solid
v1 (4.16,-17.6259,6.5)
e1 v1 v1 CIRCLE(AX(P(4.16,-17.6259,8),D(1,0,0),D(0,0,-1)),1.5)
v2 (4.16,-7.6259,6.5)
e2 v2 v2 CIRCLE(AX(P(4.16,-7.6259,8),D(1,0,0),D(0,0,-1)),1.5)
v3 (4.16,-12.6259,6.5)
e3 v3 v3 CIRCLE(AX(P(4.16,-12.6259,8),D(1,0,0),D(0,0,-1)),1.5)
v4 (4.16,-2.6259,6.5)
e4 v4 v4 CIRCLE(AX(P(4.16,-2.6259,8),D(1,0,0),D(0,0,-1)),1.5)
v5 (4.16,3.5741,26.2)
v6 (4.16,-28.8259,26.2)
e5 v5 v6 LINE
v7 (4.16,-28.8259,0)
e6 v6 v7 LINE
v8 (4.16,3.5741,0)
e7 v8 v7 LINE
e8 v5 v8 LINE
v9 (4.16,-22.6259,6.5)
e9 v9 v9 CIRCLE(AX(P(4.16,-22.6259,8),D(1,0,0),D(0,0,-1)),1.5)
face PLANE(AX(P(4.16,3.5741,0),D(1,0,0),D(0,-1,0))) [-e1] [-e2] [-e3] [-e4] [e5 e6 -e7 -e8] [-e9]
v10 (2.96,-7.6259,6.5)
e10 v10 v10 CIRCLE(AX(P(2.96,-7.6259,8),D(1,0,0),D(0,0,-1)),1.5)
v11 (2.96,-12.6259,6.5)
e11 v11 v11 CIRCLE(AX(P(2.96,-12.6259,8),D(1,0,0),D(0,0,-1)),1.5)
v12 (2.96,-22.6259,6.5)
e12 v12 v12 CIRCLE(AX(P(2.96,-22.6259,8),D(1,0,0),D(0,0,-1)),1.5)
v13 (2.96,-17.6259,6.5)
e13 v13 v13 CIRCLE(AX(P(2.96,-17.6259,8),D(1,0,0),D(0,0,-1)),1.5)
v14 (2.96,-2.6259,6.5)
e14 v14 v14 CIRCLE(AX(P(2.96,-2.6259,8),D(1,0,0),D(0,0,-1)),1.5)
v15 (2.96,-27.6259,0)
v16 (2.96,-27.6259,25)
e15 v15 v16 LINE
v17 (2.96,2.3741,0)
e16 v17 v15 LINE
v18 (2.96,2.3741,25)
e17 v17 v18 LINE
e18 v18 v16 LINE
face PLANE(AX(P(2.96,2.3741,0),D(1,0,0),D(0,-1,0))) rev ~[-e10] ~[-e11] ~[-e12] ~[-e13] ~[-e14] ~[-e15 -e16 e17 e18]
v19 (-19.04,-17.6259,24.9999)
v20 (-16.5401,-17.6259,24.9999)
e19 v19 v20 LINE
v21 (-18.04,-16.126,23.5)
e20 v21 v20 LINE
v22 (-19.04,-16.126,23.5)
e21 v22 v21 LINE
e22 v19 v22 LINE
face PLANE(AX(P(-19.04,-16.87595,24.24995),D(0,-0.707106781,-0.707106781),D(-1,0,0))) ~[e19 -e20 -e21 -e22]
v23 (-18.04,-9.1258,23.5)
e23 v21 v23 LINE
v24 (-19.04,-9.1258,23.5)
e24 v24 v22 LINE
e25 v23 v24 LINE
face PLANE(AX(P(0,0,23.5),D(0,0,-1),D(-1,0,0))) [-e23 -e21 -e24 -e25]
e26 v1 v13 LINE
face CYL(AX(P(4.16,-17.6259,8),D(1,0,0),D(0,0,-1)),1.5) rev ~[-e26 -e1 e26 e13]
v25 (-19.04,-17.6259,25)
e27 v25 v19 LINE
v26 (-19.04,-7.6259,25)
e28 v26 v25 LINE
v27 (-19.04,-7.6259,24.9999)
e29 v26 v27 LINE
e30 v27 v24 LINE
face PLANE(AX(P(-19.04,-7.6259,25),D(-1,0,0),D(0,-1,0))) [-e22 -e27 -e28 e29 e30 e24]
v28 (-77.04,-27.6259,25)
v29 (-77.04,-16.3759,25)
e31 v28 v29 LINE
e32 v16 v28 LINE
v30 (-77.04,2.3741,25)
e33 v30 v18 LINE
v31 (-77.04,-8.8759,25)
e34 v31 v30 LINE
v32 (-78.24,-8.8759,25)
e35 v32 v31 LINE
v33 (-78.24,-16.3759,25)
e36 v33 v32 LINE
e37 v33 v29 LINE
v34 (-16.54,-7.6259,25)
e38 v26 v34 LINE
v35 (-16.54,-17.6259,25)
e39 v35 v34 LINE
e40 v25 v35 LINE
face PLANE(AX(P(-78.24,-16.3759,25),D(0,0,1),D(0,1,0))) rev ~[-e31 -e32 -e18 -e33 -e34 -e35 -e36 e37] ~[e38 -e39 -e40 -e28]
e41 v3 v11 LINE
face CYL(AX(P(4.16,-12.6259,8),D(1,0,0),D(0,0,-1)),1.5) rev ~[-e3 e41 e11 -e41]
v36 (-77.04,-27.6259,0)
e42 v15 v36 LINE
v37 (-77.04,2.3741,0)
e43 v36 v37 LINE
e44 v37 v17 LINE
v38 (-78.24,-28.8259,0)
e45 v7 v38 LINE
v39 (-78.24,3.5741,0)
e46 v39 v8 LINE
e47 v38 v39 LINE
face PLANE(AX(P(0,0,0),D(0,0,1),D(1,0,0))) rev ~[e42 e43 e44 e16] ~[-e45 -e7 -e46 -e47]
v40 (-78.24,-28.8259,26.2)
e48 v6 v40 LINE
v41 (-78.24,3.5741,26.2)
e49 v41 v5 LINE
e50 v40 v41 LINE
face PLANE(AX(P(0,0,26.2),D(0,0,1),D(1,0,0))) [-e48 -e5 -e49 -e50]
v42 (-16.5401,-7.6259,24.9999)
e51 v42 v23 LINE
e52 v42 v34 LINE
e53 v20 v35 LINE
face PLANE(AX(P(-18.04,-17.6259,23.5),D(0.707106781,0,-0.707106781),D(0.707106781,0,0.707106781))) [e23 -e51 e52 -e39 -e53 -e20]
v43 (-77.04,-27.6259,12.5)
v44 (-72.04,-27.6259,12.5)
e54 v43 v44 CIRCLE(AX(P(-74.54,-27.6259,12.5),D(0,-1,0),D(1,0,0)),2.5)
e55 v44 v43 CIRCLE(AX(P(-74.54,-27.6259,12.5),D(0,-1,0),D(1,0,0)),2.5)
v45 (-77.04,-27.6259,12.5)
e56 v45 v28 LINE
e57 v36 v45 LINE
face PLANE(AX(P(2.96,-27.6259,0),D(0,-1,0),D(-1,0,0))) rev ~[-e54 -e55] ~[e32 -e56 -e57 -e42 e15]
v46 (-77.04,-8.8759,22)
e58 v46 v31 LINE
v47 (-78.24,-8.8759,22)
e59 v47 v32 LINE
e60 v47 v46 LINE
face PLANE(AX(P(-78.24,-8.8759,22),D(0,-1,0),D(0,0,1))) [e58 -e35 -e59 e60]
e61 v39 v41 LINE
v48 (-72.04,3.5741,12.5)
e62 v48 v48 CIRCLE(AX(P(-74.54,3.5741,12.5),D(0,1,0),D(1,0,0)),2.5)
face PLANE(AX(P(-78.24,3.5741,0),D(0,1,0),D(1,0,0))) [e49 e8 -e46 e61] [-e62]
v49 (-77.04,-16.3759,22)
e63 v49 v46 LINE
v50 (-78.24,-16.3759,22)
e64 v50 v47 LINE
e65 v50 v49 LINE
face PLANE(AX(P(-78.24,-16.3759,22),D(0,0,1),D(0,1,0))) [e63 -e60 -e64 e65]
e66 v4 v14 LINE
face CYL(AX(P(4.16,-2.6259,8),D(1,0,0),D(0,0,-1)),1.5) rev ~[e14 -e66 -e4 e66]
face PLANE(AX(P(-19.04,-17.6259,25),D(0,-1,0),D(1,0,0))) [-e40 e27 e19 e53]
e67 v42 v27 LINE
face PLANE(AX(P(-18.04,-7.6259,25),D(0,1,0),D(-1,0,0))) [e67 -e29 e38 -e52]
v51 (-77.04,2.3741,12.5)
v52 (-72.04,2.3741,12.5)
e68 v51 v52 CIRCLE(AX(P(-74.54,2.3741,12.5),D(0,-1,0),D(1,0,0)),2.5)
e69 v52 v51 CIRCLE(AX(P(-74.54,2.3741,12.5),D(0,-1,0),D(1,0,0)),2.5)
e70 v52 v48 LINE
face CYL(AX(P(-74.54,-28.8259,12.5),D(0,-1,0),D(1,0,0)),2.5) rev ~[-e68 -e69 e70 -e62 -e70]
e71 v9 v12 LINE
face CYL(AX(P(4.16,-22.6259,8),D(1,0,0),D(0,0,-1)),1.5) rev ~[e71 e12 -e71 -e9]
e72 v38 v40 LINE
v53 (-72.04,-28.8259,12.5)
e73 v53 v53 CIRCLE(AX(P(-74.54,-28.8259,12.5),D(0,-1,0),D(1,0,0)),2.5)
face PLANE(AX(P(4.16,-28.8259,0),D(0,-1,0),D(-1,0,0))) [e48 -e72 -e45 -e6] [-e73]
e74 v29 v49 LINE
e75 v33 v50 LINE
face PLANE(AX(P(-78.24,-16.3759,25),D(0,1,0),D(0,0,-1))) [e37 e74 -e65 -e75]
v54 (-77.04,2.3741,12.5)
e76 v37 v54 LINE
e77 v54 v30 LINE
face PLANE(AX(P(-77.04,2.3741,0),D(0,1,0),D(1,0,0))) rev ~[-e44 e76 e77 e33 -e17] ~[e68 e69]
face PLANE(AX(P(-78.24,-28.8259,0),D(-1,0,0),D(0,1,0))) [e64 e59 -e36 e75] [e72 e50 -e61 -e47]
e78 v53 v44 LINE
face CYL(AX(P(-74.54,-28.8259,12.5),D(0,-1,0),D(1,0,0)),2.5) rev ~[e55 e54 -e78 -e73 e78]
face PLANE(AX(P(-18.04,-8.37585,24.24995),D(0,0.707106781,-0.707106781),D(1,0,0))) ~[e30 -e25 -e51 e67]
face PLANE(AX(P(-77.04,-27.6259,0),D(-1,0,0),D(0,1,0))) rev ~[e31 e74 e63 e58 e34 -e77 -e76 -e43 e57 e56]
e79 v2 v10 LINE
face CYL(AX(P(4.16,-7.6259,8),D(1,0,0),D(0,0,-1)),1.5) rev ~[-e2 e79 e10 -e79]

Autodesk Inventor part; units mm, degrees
ref_plane "YZ Plane" through (0, 0, 0) normal (1, 0, 0) x (0, 1, 0)
ref_plane "XZ Plane" through (0, 0, 0) normal (0, 1, 0) x (-1, 0, 0)
ref_plane "XY Plane" through (0, 0, 0) normal (0, 0, 1) x (1, 0, 0)
sketch "Sketch1" plane through (0, 0, 0) normal (0, 0, 1) x (1, 0, 0)
  line L0 (-78.24, 3.5741) -> (4.16, 3.5741)
  line L1 (4.16, 3.5741) -> (4.16, -28.8259)
  line L2 (4.16, -28.8259) -> (-78.24, -28.8259)
  line L3 (-78.24, -28.8259) -> (-78.24, 3.5741)
  line L4 (-77.04, 2.3741) -> (2.96, 2.3741)
  line L5 (2.96, 2.3741) -> (2.96, -27.6259)
  line L6 (2.96, -27.6259) -> (-77.04, -27.6259)
  line L7 (-77.04, -27.6259) -> (-77.04, 2.3741)
  point P0 (0, 0)
  dimension "d0" = 32.4
  dimension "d1" = 82.4
  dimension "d2" = 1.2
  dimension "d3" = 1.2
  dimension "d4" = 1.2
  dimension "d5" = 1.2
extrude "Extrusion1" add sketch "Sketch1" along normal blind 25
sketch "Sketch2" plane through (0, 0, 25) normal (0, 0, 1) x (1, 0, 0)
  line L0 (-78.24, 3.5741) -> (4.16, 3.5741)
  line L1 (4.16, 3.5741) -> (4.16, -28.8259)
  line L2 (4.16, -28.8259) -> (-78.24, -28.8259)
  line L3 (-78.24, -28.8259) -> (-78.24, 3.5741)
  point P0 (0, 0)
extrude "Extrusion2" add sketch "Sketch2" along normal blind 1.2
sketch "Sketch3" plane through (-78.24, -28.8259, 0) normal (-1, 0, 0) x (0, 0, 1)
  line L0 (25, 1.2) -> (25, 31.2) projected
  line L1 (25, 12.45) -> (22, 12.45)
  line L2 (22, 12.45) -> (22, 19.95)
  line L3 (22, 19.95) -> (25, 19.95)
  line L4 (25, 19.95) -> (25, 12.45)
  line L5 (0, 1.2) -> (25, 1.2) projected
  line L6 (0, 31.2) -> (25, 31.2) projected
  point P0 (0, 28.8259)
  dimension "d10" = 7.5
  dimension "d11" = 3
  dimension "d12" = 11.25
  dimension "d13" = 11.25
extrude "Extrusion3" cut sketch "Sketch3" against normal blind 1.2
sketch "Sketch4" plane through (0, 0, 25) normal (0, 0, -1) x (-1, 0, 0)
  point P0 (0, 0)
sketch "Sketch5" plane through (0, 0, 25) normal (0, 0, -1) x (-1, 0, 0)
  line L0 (18.04, -7.6259) -> (19.04, -7.6259)
  line L1 (19.04, -7.6259) -> (19.04, -17.6259)
  line L2 (19.04, -17.6259) -> (18.04, -17.6259)
  line L3 (18.04, -17.6259) -> (18.04, -7.6259)
  line L4 (-2.96, 2.3741) -> (77.04, 2.3741) projected
  line L5 (77.04, -27.6259) -> (-2.96, -27.6259) projected
  line L6 (77.04, 2.3741) -> (77.04, -27.6259) projected
  point P0 (0, 0)
  dimension "d16" = 1
  dimension "d17" = 10
  dimension "d18" = 10
  dimension "d19" = 10
  dimension "d20" = 58
extrude "Extrusion4" add sketch "Sketch5" along normal blind 1.5
chamfer "Chamfer1" distance 1.5 angle 45 2 edges at (-18.54, -17.6259, 23.5) (-18.54, -7.6259, 23.5)
chamfer "Chamfer2" distance 1.5 angle 45 1 edges at (-18.04, -12.6259, 25)
sketch "Sketch6" plane through (-78.24, -28.8259, 0) normal (0, -1, 0) x (1, 0, 0)
  circle A0 centre (3.7, 12.5) radius 2.5
  line L0 (1.2, 0) -> (1.2, 25) projected
  point P0 (78.24, 0)
  dimension "d29" = 5
  dimension "d30" = 2.5
extrude "Extrusion5" cut sketch "Sketch6" against normal blind 40
sketch "Sketch7" plane through (4.16, -28.8259, 0) normal (1, 0, 0) x (0, 0, -1)
  line L0 (0, 31.2) -> (-25, 31.2) projected
  line L1 (0, 32.4) -> (0, 0) projected
  circle A0 centre (-8, 26.2) radius 1.5
  circle A1 centre (-8, 21.2) radius 1.5
  circle A2 centre (-8, 16.2) radius 1.5
  circle A3 centre (-8, 11.2) radius 1.5
  circle A4 centre (-8, 6.2) radius 1.5
  line L2 (0, 1.2) -> (-25, 1.2) projected
  point P0 (0, 28.8259)
  point P1 (-8, 31.2)
  dimension "d33" = 8
  dimension "d34" = 3
  dimension "d35" = 3
  dimension "d36" = 3
  dimension "d37" = 3
  dimension "d38" = 3
  dimension "d39" = 5
  dimension "d40" = 5
  dimension "d41" = 5
  dimension "d42" = 5
  dimension "d43" = 5
  dimension "d44" = 5
extrude "Extrusion6" cut sketch "Sketch7" against normal blind 3
properties part number "Case Botom"
